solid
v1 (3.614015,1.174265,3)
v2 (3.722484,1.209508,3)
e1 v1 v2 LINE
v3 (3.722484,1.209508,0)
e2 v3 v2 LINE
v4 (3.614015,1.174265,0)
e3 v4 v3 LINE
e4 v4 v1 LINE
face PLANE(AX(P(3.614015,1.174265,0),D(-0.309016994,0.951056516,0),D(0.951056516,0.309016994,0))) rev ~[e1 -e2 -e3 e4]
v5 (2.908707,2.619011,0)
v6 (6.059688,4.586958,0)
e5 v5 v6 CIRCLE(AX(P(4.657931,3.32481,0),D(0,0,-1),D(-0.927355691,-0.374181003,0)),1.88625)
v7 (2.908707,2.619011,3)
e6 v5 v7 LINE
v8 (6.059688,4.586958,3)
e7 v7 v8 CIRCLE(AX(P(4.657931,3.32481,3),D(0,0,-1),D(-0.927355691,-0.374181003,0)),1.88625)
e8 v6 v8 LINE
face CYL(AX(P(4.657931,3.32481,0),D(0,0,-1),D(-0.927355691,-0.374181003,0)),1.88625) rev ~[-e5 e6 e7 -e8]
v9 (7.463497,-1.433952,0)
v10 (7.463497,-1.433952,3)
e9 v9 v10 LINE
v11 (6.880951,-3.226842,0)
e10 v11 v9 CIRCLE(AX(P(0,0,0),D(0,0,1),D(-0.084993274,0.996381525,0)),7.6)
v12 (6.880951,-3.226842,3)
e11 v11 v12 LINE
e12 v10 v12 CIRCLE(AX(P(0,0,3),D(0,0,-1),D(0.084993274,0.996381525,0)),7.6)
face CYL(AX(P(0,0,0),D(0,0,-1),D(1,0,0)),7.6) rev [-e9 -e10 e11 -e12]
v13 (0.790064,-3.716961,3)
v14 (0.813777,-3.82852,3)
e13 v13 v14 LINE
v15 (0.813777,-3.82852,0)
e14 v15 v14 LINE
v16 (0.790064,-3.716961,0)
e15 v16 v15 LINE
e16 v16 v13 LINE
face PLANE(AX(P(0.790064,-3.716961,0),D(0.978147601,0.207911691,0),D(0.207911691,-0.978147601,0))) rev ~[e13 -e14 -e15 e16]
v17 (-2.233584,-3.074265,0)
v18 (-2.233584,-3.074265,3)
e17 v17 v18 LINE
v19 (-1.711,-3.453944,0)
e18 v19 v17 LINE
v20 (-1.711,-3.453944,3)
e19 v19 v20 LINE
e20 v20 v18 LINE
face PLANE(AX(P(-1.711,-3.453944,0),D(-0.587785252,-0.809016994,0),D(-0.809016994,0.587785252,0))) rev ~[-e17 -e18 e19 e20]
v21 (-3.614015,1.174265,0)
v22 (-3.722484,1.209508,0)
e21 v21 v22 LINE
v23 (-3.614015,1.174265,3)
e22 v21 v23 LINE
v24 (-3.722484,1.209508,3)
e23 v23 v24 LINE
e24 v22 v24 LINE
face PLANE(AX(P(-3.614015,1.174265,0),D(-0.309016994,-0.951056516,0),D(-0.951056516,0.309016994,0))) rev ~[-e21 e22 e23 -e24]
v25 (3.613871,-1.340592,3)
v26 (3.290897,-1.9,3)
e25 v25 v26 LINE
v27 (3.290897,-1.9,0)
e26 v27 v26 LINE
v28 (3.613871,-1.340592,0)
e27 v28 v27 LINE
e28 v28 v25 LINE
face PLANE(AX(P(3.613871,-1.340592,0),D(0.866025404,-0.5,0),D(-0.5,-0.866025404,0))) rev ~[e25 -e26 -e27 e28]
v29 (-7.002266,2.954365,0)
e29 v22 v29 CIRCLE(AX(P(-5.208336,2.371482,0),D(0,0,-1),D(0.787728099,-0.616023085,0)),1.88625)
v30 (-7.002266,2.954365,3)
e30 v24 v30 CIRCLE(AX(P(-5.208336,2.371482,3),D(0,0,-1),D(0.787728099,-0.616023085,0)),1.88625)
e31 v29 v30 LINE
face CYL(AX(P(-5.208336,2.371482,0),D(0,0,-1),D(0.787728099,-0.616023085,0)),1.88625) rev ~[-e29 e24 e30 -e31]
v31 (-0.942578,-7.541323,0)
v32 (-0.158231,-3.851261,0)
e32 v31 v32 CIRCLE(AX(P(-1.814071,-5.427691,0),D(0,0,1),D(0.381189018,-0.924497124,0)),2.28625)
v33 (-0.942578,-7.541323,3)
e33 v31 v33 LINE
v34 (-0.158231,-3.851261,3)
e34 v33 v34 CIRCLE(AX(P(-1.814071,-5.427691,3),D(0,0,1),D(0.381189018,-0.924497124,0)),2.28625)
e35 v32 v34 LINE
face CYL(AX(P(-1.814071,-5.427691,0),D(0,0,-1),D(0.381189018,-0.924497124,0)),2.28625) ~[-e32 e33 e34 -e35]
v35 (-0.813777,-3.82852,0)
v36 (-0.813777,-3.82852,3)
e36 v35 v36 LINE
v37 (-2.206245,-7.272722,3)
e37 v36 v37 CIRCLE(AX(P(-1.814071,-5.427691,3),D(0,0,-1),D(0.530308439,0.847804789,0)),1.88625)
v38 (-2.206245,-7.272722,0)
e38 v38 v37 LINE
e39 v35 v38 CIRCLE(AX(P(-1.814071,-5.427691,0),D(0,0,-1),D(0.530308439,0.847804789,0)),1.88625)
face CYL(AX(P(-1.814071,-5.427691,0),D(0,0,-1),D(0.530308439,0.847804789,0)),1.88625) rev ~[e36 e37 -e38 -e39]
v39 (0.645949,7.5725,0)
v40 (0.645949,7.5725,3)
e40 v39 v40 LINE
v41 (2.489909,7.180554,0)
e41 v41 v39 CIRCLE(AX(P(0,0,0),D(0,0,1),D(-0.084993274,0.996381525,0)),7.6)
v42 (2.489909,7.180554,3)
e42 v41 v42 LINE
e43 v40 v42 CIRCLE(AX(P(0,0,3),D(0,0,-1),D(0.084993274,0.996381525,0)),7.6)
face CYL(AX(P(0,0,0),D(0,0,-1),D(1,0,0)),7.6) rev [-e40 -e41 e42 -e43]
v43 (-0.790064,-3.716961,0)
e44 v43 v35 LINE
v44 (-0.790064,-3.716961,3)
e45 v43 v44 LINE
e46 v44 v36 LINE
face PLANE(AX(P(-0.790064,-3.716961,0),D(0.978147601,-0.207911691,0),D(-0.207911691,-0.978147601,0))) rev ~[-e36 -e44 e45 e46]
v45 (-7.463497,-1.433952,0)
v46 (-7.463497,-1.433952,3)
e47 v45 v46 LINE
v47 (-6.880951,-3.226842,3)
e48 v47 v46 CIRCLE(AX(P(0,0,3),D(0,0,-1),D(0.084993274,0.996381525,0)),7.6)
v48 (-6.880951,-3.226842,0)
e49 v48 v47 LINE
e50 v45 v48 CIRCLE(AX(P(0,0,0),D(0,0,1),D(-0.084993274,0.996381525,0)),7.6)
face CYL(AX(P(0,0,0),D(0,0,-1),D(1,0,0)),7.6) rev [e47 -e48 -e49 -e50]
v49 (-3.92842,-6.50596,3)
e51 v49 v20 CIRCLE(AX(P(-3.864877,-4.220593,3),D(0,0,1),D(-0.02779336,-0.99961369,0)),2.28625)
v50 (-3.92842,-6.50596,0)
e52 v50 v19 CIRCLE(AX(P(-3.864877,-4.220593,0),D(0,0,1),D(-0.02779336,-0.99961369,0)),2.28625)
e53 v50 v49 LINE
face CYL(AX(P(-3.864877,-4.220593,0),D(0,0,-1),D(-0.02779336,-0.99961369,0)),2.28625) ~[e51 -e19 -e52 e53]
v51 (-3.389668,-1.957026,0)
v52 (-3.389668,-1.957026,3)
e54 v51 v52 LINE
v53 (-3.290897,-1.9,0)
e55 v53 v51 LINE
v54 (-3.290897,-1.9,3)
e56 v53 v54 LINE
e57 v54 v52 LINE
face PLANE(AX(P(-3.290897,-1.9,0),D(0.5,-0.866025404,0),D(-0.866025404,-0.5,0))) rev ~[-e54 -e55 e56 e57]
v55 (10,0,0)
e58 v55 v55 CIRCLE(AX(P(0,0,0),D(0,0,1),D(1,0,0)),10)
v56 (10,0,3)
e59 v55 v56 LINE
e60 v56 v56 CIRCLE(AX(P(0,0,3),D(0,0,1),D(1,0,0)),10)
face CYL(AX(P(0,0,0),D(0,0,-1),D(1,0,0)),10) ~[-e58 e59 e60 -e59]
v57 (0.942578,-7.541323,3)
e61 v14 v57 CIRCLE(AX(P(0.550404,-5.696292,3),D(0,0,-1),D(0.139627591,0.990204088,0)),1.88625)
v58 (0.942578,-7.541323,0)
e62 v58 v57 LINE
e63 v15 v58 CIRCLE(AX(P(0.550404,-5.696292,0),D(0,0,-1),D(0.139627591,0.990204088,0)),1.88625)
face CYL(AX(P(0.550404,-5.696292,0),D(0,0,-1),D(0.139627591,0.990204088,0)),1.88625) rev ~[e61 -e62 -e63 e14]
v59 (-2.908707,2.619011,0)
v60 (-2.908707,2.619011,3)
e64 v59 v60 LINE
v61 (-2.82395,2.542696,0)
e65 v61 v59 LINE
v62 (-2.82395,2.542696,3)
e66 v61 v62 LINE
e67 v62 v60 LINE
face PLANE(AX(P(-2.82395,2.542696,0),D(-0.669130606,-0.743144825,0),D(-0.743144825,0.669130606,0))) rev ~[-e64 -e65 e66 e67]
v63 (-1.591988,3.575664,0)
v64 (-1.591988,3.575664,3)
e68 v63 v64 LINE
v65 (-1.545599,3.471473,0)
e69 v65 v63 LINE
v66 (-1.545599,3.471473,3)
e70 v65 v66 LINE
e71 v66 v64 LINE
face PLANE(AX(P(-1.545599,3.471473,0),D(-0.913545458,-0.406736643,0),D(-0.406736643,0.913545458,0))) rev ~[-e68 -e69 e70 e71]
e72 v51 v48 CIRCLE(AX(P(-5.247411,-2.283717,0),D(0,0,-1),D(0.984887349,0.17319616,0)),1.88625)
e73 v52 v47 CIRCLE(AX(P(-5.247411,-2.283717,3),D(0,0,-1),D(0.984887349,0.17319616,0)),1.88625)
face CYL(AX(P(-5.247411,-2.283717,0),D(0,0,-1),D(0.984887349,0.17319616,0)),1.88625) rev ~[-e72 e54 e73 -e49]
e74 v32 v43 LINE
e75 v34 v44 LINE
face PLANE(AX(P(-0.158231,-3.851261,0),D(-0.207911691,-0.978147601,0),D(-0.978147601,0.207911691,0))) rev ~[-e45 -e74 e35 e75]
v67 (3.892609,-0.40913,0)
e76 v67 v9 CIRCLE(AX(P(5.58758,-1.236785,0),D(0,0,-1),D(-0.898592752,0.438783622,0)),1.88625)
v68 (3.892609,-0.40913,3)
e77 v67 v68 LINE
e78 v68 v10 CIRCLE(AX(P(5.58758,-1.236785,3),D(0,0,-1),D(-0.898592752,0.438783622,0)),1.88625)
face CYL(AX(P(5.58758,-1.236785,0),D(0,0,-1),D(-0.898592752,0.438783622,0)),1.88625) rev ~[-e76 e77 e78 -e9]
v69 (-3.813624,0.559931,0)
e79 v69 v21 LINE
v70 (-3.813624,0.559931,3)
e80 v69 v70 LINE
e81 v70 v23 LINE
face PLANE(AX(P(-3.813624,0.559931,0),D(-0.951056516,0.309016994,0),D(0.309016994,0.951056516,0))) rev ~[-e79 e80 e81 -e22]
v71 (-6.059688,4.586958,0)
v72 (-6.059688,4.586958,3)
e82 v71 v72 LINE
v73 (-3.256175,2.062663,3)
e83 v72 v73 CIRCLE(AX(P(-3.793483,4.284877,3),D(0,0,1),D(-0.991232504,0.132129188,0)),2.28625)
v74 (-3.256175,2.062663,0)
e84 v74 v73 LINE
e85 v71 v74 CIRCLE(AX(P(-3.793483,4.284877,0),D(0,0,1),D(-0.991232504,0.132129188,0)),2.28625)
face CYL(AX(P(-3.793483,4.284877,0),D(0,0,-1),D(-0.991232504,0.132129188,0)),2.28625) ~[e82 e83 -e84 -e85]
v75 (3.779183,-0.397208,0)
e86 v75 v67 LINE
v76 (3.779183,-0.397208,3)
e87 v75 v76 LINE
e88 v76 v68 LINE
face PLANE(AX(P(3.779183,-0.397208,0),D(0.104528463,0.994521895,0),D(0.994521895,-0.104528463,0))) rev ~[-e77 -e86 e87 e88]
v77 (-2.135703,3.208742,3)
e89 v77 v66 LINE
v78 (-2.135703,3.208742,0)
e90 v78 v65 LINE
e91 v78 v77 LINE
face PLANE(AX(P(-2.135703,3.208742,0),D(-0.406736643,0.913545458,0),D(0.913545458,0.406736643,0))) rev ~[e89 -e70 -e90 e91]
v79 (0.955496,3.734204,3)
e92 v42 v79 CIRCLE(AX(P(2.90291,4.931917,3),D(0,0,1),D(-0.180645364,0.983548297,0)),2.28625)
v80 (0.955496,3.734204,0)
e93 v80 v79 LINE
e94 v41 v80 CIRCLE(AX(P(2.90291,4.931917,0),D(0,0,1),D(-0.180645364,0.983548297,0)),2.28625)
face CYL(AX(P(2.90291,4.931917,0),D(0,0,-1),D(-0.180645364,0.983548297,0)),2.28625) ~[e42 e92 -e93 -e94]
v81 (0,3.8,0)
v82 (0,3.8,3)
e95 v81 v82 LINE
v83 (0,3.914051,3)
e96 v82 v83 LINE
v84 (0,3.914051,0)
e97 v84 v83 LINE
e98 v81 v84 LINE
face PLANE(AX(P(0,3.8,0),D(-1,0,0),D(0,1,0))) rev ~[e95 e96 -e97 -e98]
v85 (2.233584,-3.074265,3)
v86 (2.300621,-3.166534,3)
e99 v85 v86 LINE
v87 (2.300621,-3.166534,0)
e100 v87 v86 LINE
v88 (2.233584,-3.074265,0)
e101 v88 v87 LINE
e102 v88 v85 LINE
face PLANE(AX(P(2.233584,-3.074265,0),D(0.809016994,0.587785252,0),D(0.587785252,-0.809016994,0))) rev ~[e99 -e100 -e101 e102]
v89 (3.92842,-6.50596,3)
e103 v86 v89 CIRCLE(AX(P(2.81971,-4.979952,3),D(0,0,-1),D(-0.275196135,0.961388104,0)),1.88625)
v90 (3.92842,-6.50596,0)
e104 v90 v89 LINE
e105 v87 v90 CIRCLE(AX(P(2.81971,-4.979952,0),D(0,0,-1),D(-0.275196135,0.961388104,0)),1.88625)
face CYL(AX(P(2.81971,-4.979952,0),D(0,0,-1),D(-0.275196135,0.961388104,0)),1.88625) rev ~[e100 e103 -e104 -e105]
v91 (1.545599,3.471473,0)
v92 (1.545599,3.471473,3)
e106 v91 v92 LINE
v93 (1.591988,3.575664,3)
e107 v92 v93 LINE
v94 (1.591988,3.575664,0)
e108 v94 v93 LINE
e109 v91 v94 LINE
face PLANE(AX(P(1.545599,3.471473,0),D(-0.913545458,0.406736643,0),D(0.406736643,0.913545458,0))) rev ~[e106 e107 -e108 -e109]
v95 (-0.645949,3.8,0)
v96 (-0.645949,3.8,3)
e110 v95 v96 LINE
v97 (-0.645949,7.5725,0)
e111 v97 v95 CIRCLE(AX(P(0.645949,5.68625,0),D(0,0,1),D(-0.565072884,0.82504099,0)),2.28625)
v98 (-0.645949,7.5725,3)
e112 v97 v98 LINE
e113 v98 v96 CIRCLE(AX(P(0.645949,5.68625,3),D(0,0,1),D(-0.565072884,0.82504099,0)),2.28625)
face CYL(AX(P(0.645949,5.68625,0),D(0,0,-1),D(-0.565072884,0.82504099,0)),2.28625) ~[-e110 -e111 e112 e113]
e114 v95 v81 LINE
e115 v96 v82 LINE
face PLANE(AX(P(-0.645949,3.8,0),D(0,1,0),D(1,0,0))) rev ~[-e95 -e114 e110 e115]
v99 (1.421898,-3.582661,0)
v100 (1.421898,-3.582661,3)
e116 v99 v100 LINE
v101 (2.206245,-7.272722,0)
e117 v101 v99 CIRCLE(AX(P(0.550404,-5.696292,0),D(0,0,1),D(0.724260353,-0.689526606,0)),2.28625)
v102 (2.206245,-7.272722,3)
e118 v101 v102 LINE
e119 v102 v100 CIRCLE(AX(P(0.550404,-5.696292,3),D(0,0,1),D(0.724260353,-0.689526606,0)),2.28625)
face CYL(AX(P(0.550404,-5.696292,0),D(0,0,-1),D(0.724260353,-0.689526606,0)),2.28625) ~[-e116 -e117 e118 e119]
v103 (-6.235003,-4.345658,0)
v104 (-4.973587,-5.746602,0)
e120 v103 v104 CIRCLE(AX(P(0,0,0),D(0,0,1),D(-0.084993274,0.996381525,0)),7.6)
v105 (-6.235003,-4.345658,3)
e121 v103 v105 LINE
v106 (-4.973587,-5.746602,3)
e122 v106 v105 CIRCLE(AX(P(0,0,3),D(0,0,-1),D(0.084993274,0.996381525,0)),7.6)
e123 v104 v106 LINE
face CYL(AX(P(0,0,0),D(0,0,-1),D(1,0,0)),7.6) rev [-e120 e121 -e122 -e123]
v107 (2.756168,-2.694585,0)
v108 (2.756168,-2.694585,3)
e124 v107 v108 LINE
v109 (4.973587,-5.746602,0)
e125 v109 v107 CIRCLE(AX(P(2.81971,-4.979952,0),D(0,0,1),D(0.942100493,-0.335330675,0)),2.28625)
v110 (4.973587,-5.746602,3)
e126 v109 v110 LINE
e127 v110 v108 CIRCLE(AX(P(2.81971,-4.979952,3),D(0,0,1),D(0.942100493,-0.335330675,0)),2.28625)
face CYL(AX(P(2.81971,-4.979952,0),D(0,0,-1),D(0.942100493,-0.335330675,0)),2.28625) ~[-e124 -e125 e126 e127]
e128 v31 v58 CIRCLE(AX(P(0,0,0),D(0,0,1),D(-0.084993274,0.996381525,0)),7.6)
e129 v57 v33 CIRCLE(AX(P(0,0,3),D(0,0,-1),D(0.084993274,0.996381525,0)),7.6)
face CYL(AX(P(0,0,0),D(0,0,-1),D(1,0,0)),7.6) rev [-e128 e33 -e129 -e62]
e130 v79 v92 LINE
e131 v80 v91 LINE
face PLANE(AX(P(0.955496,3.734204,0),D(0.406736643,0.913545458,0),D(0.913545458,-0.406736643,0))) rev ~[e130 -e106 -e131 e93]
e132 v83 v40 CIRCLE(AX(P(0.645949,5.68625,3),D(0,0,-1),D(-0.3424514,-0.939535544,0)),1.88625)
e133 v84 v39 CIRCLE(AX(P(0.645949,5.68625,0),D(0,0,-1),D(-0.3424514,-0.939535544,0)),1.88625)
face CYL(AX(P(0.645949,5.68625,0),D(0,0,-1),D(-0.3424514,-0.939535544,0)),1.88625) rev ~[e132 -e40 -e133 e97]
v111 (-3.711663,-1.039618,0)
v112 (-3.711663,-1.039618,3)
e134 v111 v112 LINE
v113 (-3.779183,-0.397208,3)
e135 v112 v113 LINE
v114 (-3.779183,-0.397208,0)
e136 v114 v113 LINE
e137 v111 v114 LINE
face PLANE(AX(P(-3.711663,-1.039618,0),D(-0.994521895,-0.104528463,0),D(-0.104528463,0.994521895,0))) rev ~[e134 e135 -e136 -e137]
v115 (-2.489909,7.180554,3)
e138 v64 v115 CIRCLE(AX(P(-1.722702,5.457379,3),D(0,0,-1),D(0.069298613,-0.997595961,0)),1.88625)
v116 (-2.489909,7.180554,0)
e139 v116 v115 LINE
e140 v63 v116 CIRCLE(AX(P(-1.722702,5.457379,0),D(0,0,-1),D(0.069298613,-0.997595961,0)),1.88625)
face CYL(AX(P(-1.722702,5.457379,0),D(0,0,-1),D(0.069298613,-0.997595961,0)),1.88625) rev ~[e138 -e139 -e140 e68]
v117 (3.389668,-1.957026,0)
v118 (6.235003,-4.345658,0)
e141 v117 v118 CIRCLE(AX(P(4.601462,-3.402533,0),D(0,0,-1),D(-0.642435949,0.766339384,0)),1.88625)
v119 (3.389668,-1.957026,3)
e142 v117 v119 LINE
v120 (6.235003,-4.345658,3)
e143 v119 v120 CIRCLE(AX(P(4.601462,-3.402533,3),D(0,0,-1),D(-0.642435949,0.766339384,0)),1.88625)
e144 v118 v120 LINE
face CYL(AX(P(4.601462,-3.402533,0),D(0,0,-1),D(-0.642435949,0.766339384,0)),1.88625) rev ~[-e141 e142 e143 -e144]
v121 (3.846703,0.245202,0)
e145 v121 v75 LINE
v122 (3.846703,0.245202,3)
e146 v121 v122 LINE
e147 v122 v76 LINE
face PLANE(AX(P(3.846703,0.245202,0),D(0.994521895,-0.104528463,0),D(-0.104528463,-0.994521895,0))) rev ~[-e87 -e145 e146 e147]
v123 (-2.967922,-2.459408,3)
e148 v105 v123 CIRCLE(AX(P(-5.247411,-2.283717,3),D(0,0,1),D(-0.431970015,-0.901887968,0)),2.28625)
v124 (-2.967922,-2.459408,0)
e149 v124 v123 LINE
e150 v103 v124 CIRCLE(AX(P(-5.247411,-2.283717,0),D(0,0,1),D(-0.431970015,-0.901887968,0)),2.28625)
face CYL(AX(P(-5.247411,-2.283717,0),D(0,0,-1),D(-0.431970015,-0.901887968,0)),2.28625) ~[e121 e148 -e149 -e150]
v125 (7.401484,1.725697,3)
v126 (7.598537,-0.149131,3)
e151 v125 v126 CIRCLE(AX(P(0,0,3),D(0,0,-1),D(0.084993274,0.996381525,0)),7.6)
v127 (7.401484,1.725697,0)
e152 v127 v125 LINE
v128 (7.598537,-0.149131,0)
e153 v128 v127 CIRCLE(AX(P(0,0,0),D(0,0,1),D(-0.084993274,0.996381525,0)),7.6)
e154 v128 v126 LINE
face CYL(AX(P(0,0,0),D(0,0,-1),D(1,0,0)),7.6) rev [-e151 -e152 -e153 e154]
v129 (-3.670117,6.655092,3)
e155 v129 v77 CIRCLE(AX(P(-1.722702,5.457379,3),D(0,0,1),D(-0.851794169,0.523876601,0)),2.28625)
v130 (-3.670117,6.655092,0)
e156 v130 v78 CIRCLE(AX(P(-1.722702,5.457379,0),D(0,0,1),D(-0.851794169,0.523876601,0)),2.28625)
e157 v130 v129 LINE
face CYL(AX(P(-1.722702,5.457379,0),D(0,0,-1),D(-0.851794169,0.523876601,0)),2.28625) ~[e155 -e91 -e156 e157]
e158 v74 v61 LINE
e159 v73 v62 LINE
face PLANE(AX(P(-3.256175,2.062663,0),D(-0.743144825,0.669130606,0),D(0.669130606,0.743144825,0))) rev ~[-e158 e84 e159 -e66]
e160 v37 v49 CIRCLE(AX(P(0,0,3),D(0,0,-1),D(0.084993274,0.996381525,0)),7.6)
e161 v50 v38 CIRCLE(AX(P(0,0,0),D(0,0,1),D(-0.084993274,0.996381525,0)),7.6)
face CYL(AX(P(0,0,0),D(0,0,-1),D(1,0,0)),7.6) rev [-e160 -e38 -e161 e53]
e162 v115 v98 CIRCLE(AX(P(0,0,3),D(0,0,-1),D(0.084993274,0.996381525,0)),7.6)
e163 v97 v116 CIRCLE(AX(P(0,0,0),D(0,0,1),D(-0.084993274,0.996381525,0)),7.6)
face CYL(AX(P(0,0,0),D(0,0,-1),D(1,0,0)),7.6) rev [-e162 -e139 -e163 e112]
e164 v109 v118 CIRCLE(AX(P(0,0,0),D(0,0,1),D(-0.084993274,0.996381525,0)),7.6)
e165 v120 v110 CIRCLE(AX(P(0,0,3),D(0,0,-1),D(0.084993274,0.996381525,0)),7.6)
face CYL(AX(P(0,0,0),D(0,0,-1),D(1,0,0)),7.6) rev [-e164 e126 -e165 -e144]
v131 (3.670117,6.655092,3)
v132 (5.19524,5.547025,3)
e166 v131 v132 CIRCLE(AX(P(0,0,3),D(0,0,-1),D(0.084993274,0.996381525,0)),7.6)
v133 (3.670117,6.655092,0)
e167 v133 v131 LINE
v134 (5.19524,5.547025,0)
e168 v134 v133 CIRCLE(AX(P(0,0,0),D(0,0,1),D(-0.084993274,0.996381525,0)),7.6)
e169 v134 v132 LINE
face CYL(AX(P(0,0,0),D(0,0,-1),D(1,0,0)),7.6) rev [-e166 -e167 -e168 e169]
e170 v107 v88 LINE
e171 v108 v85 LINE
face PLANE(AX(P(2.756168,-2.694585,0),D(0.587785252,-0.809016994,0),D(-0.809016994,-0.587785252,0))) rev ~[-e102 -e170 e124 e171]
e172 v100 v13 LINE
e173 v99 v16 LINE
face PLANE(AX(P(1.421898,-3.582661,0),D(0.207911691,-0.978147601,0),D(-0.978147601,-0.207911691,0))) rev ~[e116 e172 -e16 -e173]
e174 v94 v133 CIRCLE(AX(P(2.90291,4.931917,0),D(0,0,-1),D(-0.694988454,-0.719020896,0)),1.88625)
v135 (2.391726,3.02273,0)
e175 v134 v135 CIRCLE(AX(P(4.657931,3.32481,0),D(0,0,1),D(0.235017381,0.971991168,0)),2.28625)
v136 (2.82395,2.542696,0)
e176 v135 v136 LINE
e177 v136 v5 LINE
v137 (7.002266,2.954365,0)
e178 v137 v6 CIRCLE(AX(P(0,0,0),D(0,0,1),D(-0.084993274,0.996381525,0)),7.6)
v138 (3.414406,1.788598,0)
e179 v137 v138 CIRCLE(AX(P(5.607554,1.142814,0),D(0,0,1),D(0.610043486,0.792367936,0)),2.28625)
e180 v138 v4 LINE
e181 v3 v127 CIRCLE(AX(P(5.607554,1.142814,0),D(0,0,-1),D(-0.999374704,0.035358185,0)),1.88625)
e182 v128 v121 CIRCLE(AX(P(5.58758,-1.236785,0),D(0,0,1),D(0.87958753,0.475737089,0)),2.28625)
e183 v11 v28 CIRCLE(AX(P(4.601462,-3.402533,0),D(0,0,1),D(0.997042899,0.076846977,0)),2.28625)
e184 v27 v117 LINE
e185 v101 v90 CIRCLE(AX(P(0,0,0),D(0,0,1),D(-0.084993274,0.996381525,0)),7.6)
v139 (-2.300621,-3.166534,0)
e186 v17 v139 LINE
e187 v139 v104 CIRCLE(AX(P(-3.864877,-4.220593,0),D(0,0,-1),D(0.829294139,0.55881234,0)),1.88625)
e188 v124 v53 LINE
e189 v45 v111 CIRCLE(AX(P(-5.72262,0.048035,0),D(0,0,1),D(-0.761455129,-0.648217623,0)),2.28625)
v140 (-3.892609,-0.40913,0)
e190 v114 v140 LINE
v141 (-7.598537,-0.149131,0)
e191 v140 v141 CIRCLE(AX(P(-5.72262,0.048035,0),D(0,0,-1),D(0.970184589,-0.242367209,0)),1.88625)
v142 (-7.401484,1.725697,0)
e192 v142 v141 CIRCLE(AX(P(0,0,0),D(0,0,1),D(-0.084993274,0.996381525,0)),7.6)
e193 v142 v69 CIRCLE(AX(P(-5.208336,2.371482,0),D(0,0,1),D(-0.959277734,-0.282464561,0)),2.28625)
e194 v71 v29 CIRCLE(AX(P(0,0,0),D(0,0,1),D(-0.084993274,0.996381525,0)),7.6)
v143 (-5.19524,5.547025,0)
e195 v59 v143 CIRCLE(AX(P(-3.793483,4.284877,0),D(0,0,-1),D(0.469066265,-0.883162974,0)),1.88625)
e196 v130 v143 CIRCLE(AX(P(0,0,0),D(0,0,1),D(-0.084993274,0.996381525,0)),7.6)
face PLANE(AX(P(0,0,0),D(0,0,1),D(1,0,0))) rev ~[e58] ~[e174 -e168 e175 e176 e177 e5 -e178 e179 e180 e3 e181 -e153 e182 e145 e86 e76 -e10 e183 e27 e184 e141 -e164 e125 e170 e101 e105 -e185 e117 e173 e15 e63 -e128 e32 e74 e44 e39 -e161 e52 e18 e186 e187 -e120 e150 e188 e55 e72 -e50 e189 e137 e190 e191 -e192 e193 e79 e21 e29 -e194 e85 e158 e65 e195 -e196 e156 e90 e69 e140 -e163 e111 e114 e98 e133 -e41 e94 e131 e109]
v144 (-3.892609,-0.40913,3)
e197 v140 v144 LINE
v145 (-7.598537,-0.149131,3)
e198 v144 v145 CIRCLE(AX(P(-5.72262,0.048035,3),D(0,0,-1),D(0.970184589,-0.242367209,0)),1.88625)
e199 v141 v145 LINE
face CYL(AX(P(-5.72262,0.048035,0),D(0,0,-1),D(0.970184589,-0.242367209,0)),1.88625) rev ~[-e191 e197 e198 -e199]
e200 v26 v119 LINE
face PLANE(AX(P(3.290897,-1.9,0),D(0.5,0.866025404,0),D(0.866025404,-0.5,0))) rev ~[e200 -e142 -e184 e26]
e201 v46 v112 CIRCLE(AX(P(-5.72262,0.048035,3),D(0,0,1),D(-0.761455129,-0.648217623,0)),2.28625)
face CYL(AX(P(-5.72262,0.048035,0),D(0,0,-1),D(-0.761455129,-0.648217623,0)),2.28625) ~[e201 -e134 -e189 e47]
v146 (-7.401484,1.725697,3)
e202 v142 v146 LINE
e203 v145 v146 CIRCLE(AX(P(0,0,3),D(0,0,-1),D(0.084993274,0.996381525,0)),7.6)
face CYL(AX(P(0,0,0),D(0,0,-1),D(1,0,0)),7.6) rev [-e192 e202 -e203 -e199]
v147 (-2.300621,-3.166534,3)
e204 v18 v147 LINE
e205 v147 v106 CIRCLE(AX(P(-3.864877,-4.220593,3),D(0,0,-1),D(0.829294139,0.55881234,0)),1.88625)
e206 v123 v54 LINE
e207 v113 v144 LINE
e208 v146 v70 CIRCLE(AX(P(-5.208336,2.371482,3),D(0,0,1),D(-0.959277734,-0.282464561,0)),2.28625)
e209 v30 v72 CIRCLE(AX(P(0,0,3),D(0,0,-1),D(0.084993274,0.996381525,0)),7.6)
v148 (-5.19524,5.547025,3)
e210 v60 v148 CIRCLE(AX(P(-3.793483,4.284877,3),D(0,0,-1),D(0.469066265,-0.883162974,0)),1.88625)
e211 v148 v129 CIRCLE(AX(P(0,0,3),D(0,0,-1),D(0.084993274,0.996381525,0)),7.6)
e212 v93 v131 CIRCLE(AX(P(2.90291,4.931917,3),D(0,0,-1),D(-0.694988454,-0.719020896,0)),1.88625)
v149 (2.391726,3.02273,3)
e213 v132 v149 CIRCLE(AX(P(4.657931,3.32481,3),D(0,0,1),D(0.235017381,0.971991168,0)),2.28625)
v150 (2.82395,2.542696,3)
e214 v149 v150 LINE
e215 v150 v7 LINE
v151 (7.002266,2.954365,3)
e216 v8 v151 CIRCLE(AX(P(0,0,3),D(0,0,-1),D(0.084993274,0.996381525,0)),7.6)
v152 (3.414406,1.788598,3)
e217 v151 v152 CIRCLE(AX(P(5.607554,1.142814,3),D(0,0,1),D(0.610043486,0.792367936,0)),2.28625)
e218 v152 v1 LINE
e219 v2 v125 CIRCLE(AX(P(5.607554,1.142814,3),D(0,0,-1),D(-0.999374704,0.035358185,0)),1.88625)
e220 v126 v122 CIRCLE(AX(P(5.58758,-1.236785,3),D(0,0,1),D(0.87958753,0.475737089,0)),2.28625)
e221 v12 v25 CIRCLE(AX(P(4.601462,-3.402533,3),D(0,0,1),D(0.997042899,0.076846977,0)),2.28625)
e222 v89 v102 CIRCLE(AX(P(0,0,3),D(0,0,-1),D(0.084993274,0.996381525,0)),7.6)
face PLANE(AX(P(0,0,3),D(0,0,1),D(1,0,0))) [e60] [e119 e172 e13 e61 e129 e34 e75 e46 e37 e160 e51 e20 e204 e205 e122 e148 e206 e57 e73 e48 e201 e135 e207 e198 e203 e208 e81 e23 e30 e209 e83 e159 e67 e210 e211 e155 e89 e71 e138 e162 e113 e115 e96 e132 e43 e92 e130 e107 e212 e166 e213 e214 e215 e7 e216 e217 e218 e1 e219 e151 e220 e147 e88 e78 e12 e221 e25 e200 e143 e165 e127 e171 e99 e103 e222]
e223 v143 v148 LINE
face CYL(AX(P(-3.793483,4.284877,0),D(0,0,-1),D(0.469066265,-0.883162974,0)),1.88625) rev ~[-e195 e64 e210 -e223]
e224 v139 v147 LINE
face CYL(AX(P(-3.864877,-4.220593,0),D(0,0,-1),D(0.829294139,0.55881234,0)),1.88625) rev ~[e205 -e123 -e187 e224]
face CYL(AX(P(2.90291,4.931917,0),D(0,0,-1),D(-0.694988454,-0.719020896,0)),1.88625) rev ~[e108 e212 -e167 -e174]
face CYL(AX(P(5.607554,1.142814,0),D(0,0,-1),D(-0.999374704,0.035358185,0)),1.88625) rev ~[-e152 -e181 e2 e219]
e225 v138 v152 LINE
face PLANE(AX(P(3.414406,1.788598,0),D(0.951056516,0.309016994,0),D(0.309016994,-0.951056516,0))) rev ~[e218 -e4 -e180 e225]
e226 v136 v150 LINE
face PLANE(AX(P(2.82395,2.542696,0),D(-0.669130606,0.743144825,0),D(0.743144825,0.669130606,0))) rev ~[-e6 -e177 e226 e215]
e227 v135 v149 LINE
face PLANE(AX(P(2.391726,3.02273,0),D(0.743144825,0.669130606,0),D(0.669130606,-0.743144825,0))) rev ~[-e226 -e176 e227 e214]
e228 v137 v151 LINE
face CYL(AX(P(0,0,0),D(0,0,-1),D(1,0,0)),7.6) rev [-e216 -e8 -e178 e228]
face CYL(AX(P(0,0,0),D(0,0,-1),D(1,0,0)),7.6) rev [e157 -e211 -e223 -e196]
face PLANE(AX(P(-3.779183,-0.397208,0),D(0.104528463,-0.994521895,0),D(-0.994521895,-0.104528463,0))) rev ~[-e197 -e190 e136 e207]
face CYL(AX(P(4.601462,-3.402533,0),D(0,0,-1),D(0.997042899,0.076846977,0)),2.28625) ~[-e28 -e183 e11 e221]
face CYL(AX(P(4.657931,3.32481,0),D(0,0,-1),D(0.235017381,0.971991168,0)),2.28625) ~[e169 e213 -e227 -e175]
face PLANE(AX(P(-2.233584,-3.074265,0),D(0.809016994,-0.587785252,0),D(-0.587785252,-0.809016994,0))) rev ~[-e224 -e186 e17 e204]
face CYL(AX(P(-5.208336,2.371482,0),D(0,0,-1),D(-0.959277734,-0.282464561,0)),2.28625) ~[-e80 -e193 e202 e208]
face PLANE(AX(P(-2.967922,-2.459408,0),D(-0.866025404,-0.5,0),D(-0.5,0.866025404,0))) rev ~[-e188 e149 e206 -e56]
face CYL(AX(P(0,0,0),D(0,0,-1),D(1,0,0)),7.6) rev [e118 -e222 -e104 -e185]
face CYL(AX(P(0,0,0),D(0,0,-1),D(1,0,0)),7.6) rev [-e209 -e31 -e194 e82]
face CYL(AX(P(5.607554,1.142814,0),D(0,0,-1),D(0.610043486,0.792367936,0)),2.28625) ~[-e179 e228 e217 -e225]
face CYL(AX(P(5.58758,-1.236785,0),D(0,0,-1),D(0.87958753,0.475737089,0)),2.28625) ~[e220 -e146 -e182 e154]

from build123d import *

# Parameters (mm, degrees)
F0_R            = 10
F0_R_2          = 7.6
F1_DEPTH        = 3
F3_DEPTH        = 3
F3_COPIES_COUNT = 15


# Not quite as in the source:
# - a pattern or mirror of a feature is missing from the dataset's text; its kind, count and spacing are read off the source's solid
# - a feature names something its author has since deleted; it is built from what else it names


with BuildPart() as f1:
    # F0 (on Top) → F1 (new body)
    with BuildSketch(Plane.XY):
        Circle(F0_R)
        Circle(F0_R_2, mode=Mode.SUBTRACT)
    extrude(amount=F1_DEPTH)

    # F2 (on Top) → F3 (join, through all)
    with BuildSketch(Plane.XY):
        with BuildLine():
            ThreePointArc((0, 3.9140510674), (-1.211569324, 6.0142199175), (0.6459488827, 7.57249959))
            ThreePointArc((0.6459488827, 7.57249959), (0, 7.6), (-0.6459488827, 7.57249959))
            ThreePointArc((-0.6459488827, 7.57249959), (-1.6403009124, 5.686249795), (-0.6459488827, 3.8))
            Line((-0.6459488827, 3.8), (0, 3.8))
            Line((0, 3.8), (0, 3.9140510674))
        make_face()
    f3 = extrude(amount=F3_DEPTH)

    # F3_copies: F3 ×15 about axis
    f3_copies_axis = Axis((0, 0, 0), (0, 0, 1))
    for i in range(1, F3_COPIES_COUNT):
        add(f3.rotate(f3_copies_axis, i * 360 / F3_COPIES_COUNT))


solid = f1.part
